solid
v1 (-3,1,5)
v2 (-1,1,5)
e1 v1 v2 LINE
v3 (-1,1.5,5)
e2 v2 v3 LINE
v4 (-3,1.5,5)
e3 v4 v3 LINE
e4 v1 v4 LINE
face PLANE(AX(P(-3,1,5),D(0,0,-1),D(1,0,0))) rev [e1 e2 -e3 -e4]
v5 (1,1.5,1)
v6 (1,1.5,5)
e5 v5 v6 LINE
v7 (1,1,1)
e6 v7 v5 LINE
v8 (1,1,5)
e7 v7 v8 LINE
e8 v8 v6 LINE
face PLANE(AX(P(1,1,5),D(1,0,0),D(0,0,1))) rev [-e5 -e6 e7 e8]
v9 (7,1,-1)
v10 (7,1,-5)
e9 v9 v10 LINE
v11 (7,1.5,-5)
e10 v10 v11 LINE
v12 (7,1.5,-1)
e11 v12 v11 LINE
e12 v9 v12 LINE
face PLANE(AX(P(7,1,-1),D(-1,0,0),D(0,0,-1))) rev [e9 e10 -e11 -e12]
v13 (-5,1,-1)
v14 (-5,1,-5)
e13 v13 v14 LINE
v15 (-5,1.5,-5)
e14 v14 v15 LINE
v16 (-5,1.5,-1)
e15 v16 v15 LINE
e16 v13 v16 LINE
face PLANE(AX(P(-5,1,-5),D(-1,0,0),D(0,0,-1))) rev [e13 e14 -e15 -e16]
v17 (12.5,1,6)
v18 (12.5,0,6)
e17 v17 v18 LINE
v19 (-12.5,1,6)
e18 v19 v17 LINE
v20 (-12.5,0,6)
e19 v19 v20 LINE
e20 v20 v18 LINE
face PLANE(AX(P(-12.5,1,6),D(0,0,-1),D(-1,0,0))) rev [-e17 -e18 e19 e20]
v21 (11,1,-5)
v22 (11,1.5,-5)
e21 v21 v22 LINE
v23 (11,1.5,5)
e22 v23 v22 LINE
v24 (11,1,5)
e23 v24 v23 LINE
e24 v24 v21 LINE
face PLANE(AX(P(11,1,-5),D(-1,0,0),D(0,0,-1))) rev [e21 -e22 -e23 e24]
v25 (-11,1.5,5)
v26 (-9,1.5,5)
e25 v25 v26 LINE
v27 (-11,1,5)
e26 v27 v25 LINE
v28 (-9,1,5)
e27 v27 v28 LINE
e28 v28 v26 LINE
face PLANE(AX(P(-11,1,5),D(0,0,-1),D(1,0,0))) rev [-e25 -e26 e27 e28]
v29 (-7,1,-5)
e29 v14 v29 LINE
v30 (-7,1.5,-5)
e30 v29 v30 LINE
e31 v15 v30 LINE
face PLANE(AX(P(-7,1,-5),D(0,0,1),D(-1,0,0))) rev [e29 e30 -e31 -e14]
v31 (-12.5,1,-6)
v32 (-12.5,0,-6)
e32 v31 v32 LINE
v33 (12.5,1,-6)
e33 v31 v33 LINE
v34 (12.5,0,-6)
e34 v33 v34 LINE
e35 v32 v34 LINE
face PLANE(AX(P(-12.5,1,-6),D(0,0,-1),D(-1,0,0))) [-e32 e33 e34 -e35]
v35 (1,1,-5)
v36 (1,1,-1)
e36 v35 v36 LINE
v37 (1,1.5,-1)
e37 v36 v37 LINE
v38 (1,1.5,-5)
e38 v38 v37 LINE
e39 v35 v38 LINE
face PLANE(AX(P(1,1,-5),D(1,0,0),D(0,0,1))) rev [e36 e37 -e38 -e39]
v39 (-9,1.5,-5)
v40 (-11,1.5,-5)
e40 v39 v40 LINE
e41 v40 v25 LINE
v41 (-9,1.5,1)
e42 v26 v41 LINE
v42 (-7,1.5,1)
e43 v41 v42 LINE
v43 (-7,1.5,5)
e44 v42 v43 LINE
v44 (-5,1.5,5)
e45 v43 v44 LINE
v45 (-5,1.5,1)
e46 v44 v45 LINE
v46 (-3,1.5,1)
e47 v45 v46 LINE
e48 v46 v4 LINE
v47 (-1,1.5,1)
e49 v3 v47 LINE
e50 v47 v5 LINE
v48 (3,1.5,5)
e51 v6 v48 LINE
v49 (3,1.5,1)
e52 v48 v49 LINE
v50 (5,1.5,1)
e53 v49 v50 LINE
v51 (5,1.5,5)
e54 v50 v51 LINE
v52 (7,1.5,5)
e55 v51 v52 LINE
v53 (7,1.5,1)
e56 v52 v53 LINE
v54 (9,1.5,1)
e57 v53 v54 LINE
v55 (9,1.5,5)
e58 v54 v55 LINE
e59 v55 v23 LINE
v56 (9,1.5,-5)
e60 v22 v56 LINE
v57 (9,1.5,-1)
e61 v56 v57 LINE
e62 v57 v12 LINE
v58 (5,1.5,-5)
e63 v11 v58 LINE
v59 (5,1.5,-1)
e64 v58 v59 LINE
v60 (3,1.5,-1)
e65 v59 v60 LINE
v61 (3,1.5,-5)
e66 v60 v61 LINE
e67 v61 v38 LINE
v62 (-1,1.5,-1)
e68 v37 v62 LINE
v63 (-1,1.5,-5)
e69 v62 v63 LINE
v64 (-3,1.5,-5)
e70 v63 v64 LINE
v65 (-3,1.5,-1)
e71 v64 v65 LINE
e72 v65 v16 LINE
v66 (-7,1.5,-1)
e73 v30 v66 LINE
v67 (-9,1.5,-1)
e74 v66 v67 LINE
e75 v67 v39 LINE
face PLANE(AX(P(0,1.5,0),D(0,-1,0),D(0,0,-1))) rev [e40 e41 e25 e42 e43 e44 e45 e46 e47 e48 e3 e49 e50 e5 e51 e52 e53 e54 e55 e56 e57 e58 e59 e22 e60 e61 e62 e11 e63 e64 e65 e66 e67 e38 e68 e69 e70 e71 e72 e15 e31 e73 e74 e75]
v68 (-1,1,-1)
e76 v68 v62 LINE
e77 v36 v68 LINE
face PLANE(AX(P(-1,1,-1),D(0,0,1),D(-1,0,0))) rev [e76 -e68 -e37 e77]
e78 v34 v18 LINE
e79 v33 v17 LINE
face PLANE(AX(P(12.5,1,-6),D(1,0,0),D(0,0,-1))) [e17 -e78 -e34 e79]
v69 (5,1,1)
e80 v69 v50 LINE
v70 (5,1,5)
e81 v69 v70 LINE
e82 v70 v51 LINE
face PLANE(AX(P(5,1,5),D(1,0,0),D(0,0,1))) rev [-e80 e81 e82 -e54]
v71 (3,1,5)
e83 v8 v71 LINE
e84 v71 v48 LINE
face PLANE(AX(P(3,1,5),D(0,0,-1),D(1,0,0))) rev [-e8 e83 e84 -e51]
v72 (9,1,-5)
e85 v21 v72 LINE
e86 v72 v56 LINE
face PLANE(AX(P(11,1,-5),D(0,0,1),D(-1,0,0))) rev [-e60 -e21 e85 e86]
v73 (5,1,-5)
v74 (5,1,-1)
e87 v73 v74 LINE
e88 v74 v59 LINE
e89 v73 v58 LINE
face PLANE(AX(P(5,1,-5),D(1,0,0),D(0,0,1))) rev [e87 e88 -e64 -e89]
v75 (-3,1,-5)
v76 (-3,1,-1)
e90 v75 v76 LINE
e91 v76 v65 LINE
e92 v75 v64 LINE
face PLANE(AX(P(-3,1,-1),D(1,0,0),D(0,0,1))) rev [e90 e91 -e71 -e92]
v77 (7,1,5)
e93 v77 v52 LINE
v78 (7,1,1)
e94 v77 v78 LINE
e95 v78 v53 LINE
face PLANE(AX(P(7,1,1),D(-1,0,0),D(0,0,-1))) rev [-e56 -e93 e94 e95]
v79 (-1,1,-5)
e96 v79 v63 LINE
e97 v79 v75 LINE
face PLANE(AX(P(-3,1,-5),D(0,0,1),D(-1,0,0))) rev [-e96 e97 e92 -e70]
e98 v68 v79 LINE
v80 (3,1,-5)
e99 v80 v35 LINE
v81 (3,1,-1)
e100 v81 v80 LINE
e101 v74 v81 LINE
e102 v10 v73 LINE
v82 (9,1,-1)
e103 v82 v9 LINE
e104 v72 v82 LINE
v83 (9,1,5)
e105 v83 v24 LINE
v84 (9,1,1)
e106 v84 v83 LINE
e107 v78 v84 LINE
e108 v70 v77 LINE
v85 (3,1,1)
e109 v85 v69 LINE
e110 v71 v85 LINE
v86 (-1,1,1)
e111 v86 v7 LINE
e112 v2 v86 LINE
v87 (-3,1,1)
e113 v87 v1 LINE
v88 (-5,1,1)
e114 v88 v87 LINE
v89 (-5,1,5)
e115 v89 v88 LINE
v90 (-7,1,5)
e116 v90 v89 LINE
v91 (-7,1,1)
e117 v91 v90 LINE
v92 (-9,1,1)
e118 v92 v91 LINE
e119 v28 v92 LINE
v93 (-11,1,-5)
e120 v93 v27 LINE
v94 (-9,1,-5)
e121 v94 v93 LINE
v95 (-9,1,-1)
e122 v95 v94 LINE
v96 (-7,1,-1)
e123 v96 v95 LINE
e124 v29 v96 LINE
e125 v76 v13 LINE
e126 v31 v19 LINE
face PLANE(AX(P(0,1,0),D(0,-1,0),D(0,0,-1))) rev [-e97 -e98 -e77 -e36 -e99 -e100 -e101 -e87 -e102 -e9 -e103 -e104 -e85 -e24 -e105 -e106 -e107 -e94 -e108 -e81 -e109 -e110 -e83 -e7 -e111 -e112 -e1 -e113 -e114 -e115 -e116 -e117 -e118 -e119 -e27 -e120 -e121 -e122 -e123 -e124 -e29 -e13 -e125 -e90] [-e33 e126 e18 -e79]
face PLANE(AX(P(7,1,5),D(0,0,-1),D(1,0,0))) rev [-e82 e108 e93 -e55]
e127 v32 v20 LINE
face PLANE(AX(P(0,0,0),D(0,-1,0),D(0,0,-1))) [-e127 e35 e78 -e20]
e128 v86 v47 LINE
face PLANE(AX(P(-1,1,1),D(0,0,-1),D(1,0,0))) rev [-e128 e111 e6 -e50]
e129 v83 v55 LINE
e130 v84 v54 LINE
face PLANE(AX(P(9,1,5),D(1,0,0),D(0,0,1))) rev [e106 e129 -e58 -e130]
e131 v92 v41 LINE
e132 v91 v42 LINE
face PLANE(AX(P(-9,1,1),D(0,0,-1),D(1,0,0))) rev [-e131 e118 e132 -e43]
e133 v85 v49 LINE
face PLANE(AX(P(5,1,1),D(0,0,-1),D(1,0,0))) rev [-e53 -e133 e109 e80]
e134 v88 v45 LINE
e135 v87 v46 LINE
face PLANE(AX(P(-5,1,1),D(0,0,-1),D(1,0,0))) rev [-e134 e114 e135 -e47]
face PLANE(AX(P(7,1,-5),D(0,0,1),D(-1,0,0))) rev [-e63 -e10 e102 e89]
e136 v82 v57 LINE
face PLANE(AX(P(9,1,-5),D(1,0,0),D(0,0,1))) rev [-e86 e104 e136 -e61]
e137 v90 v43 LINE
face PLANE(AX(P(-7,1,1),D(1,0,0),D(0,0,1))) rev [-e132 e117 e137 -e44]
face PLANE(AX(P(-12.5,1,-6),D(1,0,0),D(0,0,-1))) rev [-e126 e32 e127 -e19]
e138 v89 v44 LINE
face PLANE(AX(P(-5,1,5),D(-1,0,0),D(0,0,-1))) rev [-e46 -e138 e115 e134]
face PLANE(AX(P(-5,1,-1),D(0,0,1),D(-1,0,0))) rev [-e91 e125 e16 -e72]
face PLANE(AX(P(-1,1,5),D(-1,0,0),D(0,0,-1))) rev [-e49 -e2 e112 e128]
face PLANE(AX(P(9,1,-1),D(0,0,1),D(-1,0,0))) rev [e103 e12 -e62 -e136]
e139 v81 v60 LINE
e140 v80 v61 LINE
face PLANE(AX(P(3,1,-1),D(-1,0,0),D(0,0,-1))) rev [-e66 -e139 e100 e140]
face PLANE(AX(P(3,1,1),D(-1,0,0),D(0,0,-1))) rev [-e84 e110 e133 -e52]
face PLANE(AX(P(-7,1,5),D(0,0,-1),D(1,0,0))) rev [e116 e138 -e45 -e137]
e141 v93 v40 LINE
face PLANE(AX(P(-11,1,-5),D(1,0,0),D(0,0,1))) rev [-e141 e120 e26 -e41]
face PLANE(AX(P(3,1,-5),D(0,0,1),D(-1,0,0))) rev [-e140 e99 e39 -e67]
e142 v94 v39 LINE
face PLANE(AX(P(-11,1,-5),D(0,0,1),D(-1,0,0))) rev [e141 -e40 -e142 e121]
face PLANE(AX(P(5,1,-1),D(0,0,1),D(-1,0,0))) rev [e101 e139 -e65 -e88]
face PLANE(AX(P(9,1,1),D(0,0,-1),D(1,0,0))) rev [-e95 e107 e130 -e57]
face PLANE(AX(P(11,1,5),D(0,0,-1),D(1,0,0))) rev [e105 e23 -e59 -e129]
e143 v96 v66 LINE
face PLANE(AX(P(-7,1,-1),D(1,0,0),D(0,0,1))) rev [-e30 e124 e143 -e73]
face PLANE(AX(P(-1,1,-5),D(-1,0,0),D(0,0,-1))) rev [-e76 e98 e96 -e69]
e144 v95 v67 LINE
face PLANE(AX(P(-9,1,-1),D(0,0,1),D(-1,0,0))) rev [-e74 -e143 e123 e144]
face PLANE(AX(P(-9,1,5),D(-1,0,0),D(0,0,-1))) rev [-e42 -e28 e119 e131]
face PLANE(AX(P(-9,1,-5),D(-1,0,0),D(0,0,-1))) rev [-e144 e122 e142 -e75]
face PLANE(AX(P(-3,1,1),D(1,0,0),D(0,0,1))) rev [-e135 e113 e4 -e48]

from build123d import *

# Parameters (mm, degrees)
SKETCH1_W           = 25
SKETCH1_H           = 12
BOSS_EXTRUDE1_DEPTH = 1
WRAP1_DEPTH         = 0.5


# Read off the part's stored shape, not the designer's step: Wrap1
with BuildPart() as part:
    # Sketch1 → Boss-Extrude1 (new body)
    with BuildSketch(Plane(origin=(0, 0, 0), x_dir=(1, 0, 0), z_dir=(0, 1, 0))):
        Rectangle(SKETCH1_W, SKETCH1_H)
    extrude(amount=BOSS_EXTRUDE1_DEPTH)

    # Wrap1 outline → Wrap1 (add)
    with BuildSketch(Plane(origin=(0, 1, 0), x_dir=(1, 0, 0), z_dir=(0, 1, 0))):
        Polygon((-11, -5), (-9, -5), (-9, -1), (-7, -1), (-7, -5), (-5, -5), (-5, -1), (-3, -1), (-3, -5), (-1, -5), (-1, -1), (1, -1), (1, -5), (3, -5), (3, -1), (5, -1), (5, -5), (7, -5), (7, -1), (9, -1), (9, -5), (11, -5), (11, 5), (9, 5), (9, 1), (7, 1), (7, 5), (5, 5), (5, 1), (3, 1), (3, 5), (1, 5), (1, 1), (-1, 1), (-1, 5), (-3, 5), (-3, 1), (-5, 1), (-5, 5), (-7, 5), (-7, 1), (-9, 1), (-9, 5), (-11, 5), align=None)
    extrude(amount=WRAP1_DEPTH)


solid = part.part
